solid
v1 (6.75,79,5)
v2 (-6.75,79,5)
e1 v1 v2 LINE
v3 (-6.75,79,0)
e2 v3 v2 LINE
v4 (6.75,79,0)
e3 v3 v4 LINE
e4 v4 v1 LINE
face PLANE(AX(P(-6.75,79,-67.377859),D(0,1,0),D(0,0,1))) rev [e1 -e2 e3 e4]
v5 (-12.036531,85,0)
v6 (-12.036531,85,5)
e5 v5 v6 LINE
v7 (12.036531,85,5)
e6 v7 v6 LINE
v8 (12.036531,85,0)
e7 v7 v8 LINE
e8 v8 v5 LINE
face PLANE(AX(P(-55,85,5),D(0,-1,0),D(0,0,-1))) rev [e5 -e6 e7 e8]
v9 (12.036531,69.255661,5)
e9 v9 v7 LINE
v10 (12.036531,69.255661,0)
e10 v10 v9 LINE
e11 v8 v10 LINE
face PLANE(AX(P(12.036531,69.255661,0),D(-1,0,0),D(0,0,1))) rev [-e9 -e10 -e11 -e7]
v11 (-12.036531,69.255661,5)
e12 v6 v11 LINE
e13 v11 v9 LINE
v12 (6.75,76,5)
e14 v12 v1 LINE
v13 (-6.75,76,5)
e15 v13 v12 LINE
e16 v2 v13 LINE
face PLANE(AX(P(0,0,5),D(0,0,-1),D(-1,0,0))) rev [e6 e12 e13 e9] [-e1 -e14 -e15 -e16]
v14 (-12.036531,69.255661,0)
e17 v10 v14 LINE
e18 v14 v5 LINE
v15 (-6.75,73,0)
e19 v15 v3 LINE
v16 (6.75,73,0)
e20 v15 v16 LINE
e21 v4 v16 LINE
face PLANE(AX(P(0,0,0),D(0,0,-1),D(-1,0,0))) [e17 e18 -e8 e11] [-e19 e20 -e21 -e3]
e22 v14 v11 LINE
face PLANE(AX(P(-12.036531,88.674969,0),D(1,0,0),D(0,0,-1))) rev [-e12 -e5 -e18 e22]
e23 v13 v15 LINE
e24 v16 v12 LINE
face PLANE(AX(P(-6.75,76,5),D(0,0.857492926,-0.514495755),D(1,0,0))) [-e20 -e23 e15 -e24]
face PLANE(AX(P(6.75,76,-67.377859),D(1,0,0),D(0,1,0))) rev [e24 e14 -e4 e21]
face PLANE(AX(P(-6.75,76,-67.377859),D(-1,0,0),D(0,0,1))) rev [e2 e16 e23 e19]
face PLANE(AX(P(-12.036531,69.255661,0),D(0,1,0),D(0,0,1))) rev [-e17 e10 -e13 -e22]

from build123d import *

# Parameters (mm, degrees)
SKIZZE1_W                                 = 110
SKIZZE1_H                                 = 170
AUFSATZ_LINEAR_AUSTRAGEN1_DEPTH           = 5
VERRUNDUNG1_R                             = 5
SCHNITT_LINEAR_AUSTRAGEN1_DEPTH           = 102.365674664
SKIZZE2_R                                 = 27
SCHNITT_LINEAR_AUSTRAGEN2_DEPTH           = 3
FASE1_SIZE                                = 3
SKIZZE4_R                                 = 4
AUFSATZ_LINEAR_AUSTRAGEN2_DEPTH           = 69
FASE2_SIZE                                = 1
LINEARES_MUSTER1_COUNT                    = 2
LINEARES_MUSTER1_PITCH                    = 134
LINEARES_MUSTER1_COUNT_DIR2               = 2
LINEARES_MUSTER1_PITCH_DIR2               = 98
FASE2_OF_LINEARES_MUSTER1_SIZE            = 1
VERRUNDUNG2_R                             = 1
GEWINDE1_PITCH                            = 1
GEWINDE2_PITCH                            = 1
GEWINDE3_PITCH                            = 1
GEWINDE4_PITCH                            = 1
SKIZZE10_W                                = 120
SKIZZE10_H                                = 150
SCHNITT_LINEAR_AUSTRAGEN4_DEPTH           = 2
SKIZZE12_R                                = 2
SCHNITT_LINEAR_AUSTRAGEN5_DEPTH           = 4.5
SKIZZE13_W                                = 11
SKIZZE13_H                                = 3
SKIZZE13_W_2                              = 3
SKIZZE13_H_2                              = 11
SKIZZE13_W_3                              = 13.5
SCHNITT_LINEAR_AUSTRAGEN6_DEPTH           = 125.233650894
SKIZZE14_R                                = 3
AUFSATZ_LINEAR_AUSTRAGEN3_DEPTH           = 4
SKIZZE15_R                                = 0.95
AUFSATZ_LINEAR_AUSTRAGEN4_DEPTH           = 4
AUFSATZ_LINEAR_AUSTRAGEN4_DRAFT           = 2
AUFSATZ_LINEAR_AUSTRAGEN4_PROFILE_2_DEPTH = 4
AUFSATZ_LINEAR_AUSTRAGEN4_PROFILE_2_DRAFT = 2
SKIZZE16_W                                = 123.691442011
SKIZZE16_H                                = 148.84203522
SCHNITT_LINEAR_AUSTRAGEN7_DEPTH           = 125.233650894
SKIZZE17_W                                = 11
SKIZZE17_H                                = 3
SCHNITT_LINEAR_AUSTRAGEN8_DEPTH           = 125.233650894
SCHNITT_LINEAR_AUSTRAGEN9_DEPTH           = 125.233650894
SCHNITT_LINEAR_AUSTRAGEN10_DEPTH          = 92.167499001
SCHNITT_LINEAR_AUSTRAGEN10_DEPTH_BACK     = 92.167499001
FASE3_SIZE2                               = 5
FASE3_SIZE                                = 3


with BuildPart() as part:
    # Skizze1 → Aufsatz-Linear austragen1 (new body)
    with BuildSketch(Plane.XY):
        Rectangle(SKIZZE1_W, SKIZZE1_H)
    extrude(amount=AUFSATZ_LINEAR_AUSTRAGEN1_DEPTH)

    # Verrundung1
    verrundung1_edges = [part.edges().sort_by_distance(p)[0] for p in [
        (55, -85, 2.5),
        (-55, -85, 2.5),
        (-55, 85, 2.5),
        (55, 85, 2.5),
    ]]
    fillet(verrundung1_edges, radius=VERRUNDUNG1_R)

    # Skizze3 → Schnitt-Linear austragen1 (cut, through all)
    with BuildSketch(Plane.XY.offset(5)):
        with BuildLine():
            Line((-35, 35), (-35, 17))
            ThreePointArc((-35, 17), (-27.513632984, 27.513632984), (-17, 35))
            Line((-17, 35), (-35, 35))
        make_face()
        with BuildLine():
            Line((35, 35), (17, 35))
            ThreePointArc((17, 35), (27.513632984, 27.513632984), (35, 17))
            Line((35, 17), (35, 35))
        make_face()
        with BuildLine():
            Line((35, -35), (35, -17))
            ThreePointArc((35, -17), (27.513632984, -27.513632984), (17, -35))
            Line((17, -35), (35, -35))
        make_face()
        with BuildLine():
            Line((-35, -35), (-17, -35))
            ThreePointArc((-17, -35), (-27.513632984, -27.513632984), (-35, -17))
            Line((-35, -17), (-35, -35))
        make_face()
    extrude(amount=-SCHNITT_LINEAR_AUSTRAGEN1_DEPTH, mode=Mode.SUBTRACT)

    # Skizze2 → Schnitt-Linear austragen2 (cut)
    with BuildSketch(Plane.XY.offset(5)):
        Circle(SKIZZE2_R)
    extrude(amount=-SCHNITT_LINEAR_AUSTRAGEN2_DEPTH, mode=Mode.SUBTRACT)

    # Fase1
    fase1_edges = [part.edges().sort_by_distance(p)[0] for p in [
        (-27, 0, 5),
    ]]
    chamfer(fase1_edges, length=FASE1_SIZE - 0.0001)  # a hair under: the kernel refuses the full size

    # Skizze4 → Aufsatz-Linear austragen2 (add)
    with BuildSketch(Plane(origin=(0, 0, 0), x_dir=(-1, 0, 0), z_dir=(0, 0, -1))):
        with Locations((-49, 67)):
            Circle(SKIZZE4_R)
    aufsatz_linear_austragen2 = extrude(amount=AUFSATZ_LINEAR_AUSTRAGEN2_DEPTH)

    # Fase2
    fase2_edges = [part.edges().sort_by_distance(p)[0] for p in [
        (53, 67, 0),
    ]]
    chamfer(fase2_edges, length=FASE2_SIZE)

    # Lineares Muster1: Aufsatz-Linear austragen2 2 × 2
    with Locations(*[(-j * LINEARES_MUSTER1_PITCH_DIR2, -i * LINEARES_MUSTER1_PITCH, 0) for i in range(LINEARES_MUSTER1_COUNT) for j in range(LINEARES_MUSTER1_COUNT_DIR2) if (i, j) != (0, 0)]):
        add(aufsatz_linear_austragen2)

    # Fase2 of Lineares Muster1
    fase2_of_lineares_muster1_edges = [part.edges().sort_by_distance(p)[0] for p in [
        (-45, 67, 0),
        (53, -67, 0),
        (-45, -67, 0),
    ]]
    chamfer(fase2_of_lineares_muster1_edges, length=FASE2_OF_LINEARES_MUSTER1_SIZE)

    # Verrundung2
    verrundung2_edges = [part.edges().sort_by_distance(p)[0] for p in [
        (-35, -35, 2.5),
        (-35, -17, 2.5),
        (-17, -35, 2.5),
        (35, -35, 2.5),
        (17, -35, 2.5),
        (35, -17, 2.5),
        (35, 35, 2.5),
        (35, 17, 2.5),
        (17, 35, 2.5),
        (-35, 35, 2.5),
        (-17, 35, 2.5),
        (-35, 17, 2.5),
    ]]
    fillet(verrundung2_edges, radius=VERRUNDUNG2_R)

    # Gewinde1: the profile of Gewindeprofil1 profile screwed along a right-hand helix of 12 turns, 8 arcs to a turn; built about Z, then put on its axis
    gewinde1_z = Axis((0, 0, 0), (0, 0, 1))
    gewinde1_corners = [(4.0003, 0, -0.000173205), (4.0003, 0, 0.875173202), (3.458734125, 0, 0.562499999), (3.458734125, 0, 0.312499999)]
    with BuildLine(mode=Mode.PRIVATE) as gewinde1_profile:
        Line(gewinde1_corners[0], gewinde1_corners[1])
        Line(gewinde1_corners[1], gewinde1_corners[2])
        Line(gewinde1_corners[2], gewinde1_corners[3])
        Line(gewinde1_corners[3], gewinde1_corners[0])
    gewinde1_cap = Face(gewinde1_profile.wire())
    gewinde1_turn_angles = [0, 22.5, 45, 67.5, 90, 112.5, 135, 157.5, 180, 202.5, 225, 247.5, 270, 292.5, 315, 337.5, 360]
    gewinde1_turn_weights = [1, 0.9238795325112867, 1, 0.9238795325112867, 1, 0.9238795325112867, 1, 0.9238795325112867, 1, 0.9238795325112867, 1, 0.9238795325112867, 1, 0.9238795325112867, 1, 0.9238795325112867, 1]
    gewinde1_turn_rails = [Edge.make_bspline([Vector(p[0], p[1], 0).rotate(gewinde1_z, gewinde1_turn_angles[k]) / gewinde1_turn_weights[k] + Vector(0, 0, p[2] + GEWINDE1_PITCH * gewinde1_turn_angles[k] / 360) for k in range(17)], [0, 0, 0, 1, 1, 2, 2, 3, 3, 4, 4, 5, 5, 6, 6, 7, 7, 8, 8, 8], 2, gewinde1_turn_weights) for p in gewinde1_corners]
    gewinde1_turn_sides = [Face.make_surface_from_curves(gewinde1_turn_rails[p[0]], gewinde1_turn_rails[p[1]]) for p in [(0, 1), (1, 2), (2, 3), (3, 0)]]
    gewinde1 = Plane(origin=(49, 67, -69), x_dir=(1, 0, 0), z_dir=(0, 0, 1)) * Solid(Shell([*[p.moved(Location((0, 0, GEWINDE1_PITCH * i))) for i in range(12) for p in gewinde1_turn_sides], gewinde1_cap, gewinde1_cap.rotate(gewinde1_z, 4320).moved(Location((0, 0, GEWINDE1_PITCH * 4320 / 360)))]))
    add(gewinde1, mode=Mode.SUBTRACT)

    # Gewinde2: the profile of Gewindeprofil2 profile screwed along a right-hand helix of 12 turns, 8 arcs to a turn; built about Z, then put on its axis
    gewinde2_z = Axis((0, 0, 0), (0, 0, 1))
    gewinde2_corners = [(4.0003, 0, -0.000173205), (4.0003, 0, 0.875173202), (3.458734125, 0, 0.562499999), (3.458734125, 0, 0.312499999)]
    with BuildLine(mode=Mode.PRIVATE) as gewinde2_profile:
        Line(gewinde2_corners[0], gewinde2_corners[1])
        Line(gewinde2_corners[1], gewinde2_corners[2])
        Line(gewinde2_corners[2], gewinde2_corners[3])
        Line(gewinde2_corners[3], gewinde2_corners[0])
    gewinde2_cap = Face(gewinde2_profile.wire())
    gewinde2_turn_angles = [0, 22.5, 45, 67.5, 90, 112.5, 135, 157.5, 180, 202.5, 225, 247.5, 270, 292.5, 315, 337.5, 360]
    gewinde2_turn_weights = [1, 0.9238795325112867, 1, 0.9238795325112867, 1, 0.9238795325112867, 1, 0.9238795325112867, 1, 0.9238795325112867, 1, 0.9238795325112867, 1, 0.9238795325112867, 1, 0.9238795325112867, 1]
    gewinde2_turn_rails = [Edge.make_bspline([Vector(p[0], p[1], 0).rotate(gewinde2_z, gewinde2_turn_angles[k]) / gewinde2_turn_weights[k] + Vector(0, 0, p[2] + GEWINDE2_PITCH * gewinde2_turn_angles[k] / 360) for k in range(17)], [0, 0, 0, 1, 1, 2, 2, 3, 3, 4, 4, 5, 5, 6, 6, 7, 7, 8, 8, 8], 2, gewinde2_turn_weights) for p in gewinde2_corners]
    gewinde2_turn_sides = [Face.make_surface_from_curves(gewinde2_turn_rails[p[0]], gewinde2_turn_rails[p[1]]) for p in [(0, 1), (1, 2), (2, 3), (3, 0)]]
    gewinde2 = Plane(origin=(49, -67, -69), x_dir=(1, 0, 0), z_dir=(0, 0, 1)) * Solid(Shell([*[p.moved(Location((0, 0, GEWINDE2_PITCH * i))) for i in range(12) for p in gewinde2_turn_sides], gewinde2_cap, gewinde2_cap.rotate(gewinde2_z, 4320).moved(Location((0, 0, GEWINDE2_PITCH * 4320 / 360)))]))
    add(gewinde2, mode=Mode.SUBTRACT)

    # Gewinde3: the profile of Gewindeprofil3 profile screwed along a right-hand helix of 12 turns, 8 arcs to a turn; built about Z, then put on its axis
    gewinde3_z = Axis((0, 0, 0), (0, 0, 1))
    gewinde3_corners = [(4.0003, 0, -0.000173205), (4.0003, 0, 0.875173202), (3.458734125, 0, 0.562499999), (3.458734125, 0, 0.312499999)]
    with BuildLine(mode=Mode.PRIVATE) as gewinde3_profile:
        Line(gewinde3_corners[0], gewinde3_corners[1])
        Line(gewinde3_corners[1], gewinde3_corners[2])
        Line(gewinde3_corners[2], gewinde3_corners[3])
        Line(gewinde3_corners[3], gewinde3_corners[0])
    gewinde3_cap = Face(gewinde3_profile.wire())
    gewinde3_turn_angles = [0, 22.5, 45, 67.5, 90, 112.5, 135, 157.5, 180, 202.5, 225, 247.5, 270, 292.5, 315, 337.5, 360]
    gewinde3_turn_weights = [1, 0.9238795325112867, 1, 0.9238795325112867, 1, 0.9238795325112867, 1, 0.9238795325112867, 1, 0.9238795325112867, 1, 0.9238795325112867, 1, 0.9238795325112867, 1, 0.9238795325112867, 1]
    gewinde3_turn_rails = [Edge.make_bspline([Vector(p[0], p[1], 0).rotate(gewinde3_z, gewinde3_turn_angles[k]) / gewinde3_turn_weights[k] + Vector(0, 0, p[2] + GEWINDE3_PITCH * gewinde3_turn_angles[k] / 360) for k in range(17)], [0, 0, 0, 1, 1, 2, 2, 3, 3, 4, 4, 5, 5, 6, 6, 7, 7, 8, 8, 8], 2, gewinde3_turn_weights) for p in gewinde3_corners]
    gewinde3_turn_sides = [Face.make_surface_from_curves(gewinde3_turn_rails[p[0]], gewinde3_turn_rails[p[1]]) for p in [(0, 1), (1, 2), (2, 3), (3, 0)]]
    gewinde3 = Plane(origin=(-49, -67, -69), x_dir=(1, 0, 0), z_dir=(0, 0, 1)) * Solid(Shell([*[p.moved(Location((0, 0, GEWINDE3_PITCH * i))) for i in range(12) for p in gewinde3_turn_sides], gewinde3_cap, gewinde3_cap.rotate(gewinde3_z, 4320).moved(Location((0, 0, GEWINDE3_PITCH * 4320 / 360)))]))
    add(gewinde3, mode=Mode.SUBTRACT)

    # Gewinde4: the profile of Gewindeprofil4 profile screwed along a right-hand helix of 12 turns, 8 arcs to a turn; built about Z, then put on its axis
    gewinde4_z = Axis((0, 0, 0), (0, 0, 1))
    gewinde4_corners = [(4.0003, 0, -0.000173205), (4.0003, 0, 0.875173202), (3.458734125, 0, 0.562499999), (3.458734125, 0, 0.312499999)]
    with BuildLine(mode=Mode.PRIVATE) as gewinde4_profile:
        Line(gewinde4_corners[0], gewinde4_corners[1])
        Line(gewinde4_corners[1], gewinde4_corners[2])
        Line(gewinde4_corners[2], gewinde4_corners[3])
        Line(gewinde4_corners[3], gewinde4_corners[0])
    gewinde4_cap = Face(gewinde4_profile.wire())
    gewinde4_turn_angles = [0, 22.5, 45, 67.5, 90, 112.5, 135, 157.5, 180, 202.5, 225, 247.5, 270, 292.5, 315, 337.5, 360]
    gewinde4_turn_weights = [1, 0.9238795325112867, 1, 0.9238795325112867, 1, 0.9238795325112867, 1, 0.9238795325112867, 1, 0.9238795325112867, 1, 0.9238795325112867, 1, 0.9238795325112867, 1, 0.9238795325112867, 1]
    gewinde4_turn_rails = [Edge.make_bspline([Vector(p[0], p[1], 0).rotate(gewinde4_z, gewinde4_turn_angles[k]) / gewinde4_turn_weights[k] + Vector(0, 0, p[2] + GEWINDE4_PITCH * gewinde4_turn_angles[k] / 360) for k in range(17)], [0, 0, 0, 1, 1, 2, 2, 3, 3, 4, 4, 5, 5, 6, 6, 7, 7, 8, 8, 8], 2, gewinde4_turn_weights) for p in gewinde4_corners]
    gewinde4_turn_sides = [Face.make_surface_from_curves(gewinde4_turn_rails[p[0]], gewinde4_turn_rails[p[1]]) for p in [(0, 1), (1, 2), (2, 3), (3, 0)]]
    gewinde4 = Plane(origin=(-49, 67, -69), x_dir=(1, 0, 0), z_dir=(0, 0, 1)) * Solid(Shell([*[p.moved(Location((0, 0, GEWINDE4_PITCH * i))) for i in range(12) for p in gewinde4_turn_sides], gewinde4_cap, gewinde4_cap.rotate(gewinde4_z, 4320).moved(Location((0, 0, GEWINDE4_PITCH * 4320 / 360)))]))
    add(gewinde4, mode=Mode.SUBTRACT)

    # Skizze10 → Schnitt-Linear austragen4 (cut)
    with BuildSketch(Plane(origin=(0, 0, -69), x_dir=(-1, 0, 0), z_dir=(0, 0, -1))):
        Rectangle(SKIZZE10_W, SKIZZE10_H)
    extrude(amount=-SCHNITT_LINEAR_AUSTRAGEN4_DEPTH, mode=Mode.SUBTRACT)

    # Skizze12 → Schnitt-Linear austragen5 (cut)
    with BuildSketch(Plane(origin=(0, 0, 0), x_dir=(-1, 0, 0), z_dir=(0, 0, -1))):
        with Locations((49, 59.5)):
            Circle(SKIZZE12_R)
        with Locations(Location((-49, 59.5, 0), (0, 0, 180))):
            Circle(SKIZZE12_R)
        with Locations((-49, -59.5)):
            Circle(SKIZZE12_R)
        with Locations(Location((49, -59.5, 0), (0, 0, 180))):
            Circle(SKIZZE12_R)
    extrude(amount=-SCHNITT_LINEAR_AUSTRAGEN5_DEPTH, mode=Mode.SUBTRACT)

    # Skizze13 → Schnitt-Linear austragen6 (cut, through all)
    with BuildSketch(Plane.XY.offset(5)):
        with Locations((0, -75.5)):
            Rectangle(SKIZZE13_W, SKIZZE13_H)
        with Locations((45.5, 0)):
            Rectangle(SKIZZE13_W_2, SKIZZE13_H_2)
        with Locations((-45.5, 0)):
            Rectangle(SKIZZE13_W_2, SKIZZE13_H_2)
        with Locations((0, 77.5)):
            Rectangle(SKIZZE13_W_3, SKIZZE13_H)
    extrude(amount=-SCHNITT_LINEAR_AUSTRAGEN6_DEPTH, mode=Mode.SUBTRACT)

    # Skizze14 → Aufsatz-Linear austragen3 (add)
    with BuildSketch(Plane.XY.offset(5)):
        with Locations(Location((6, 65, 0), (0, 0, 180))):
            Circle(SKIZZE14_R)
        with Locations(Location((-6, 65, 0), (0, 0, 180))):
            Circle(SKIZZE14_R)
    extrude(amount=AUFSATZ_LINEAR_AUSTRAGEN3_DEPTH)


with BuildPart() as aufsatz_linear_austragen4_tool:
    # Skizze15 → Aufsatz-Linear austragen4 (with draft: the straight prism first)
    with BuildSketch(Plane.XY.offset(9)):
        with Locations((-6, 65)):
            Circle(SKIZZE15_R)
    extrude(amount=AUFSATZ_LINEAR_AUSTRAGEN4_DEPTH)
    # Aufsatz-Linear austragen4: the draft: its side faces are tilted about the plane it starts from
    aufsatz_linear_austragen4_sides = [aufsatz_linear_austragen4_tool.faces().sort_by_distance(p)[0] for p in [
        (-6.95, 65, 11),
    ]]
    draft(aufsatz_linear_austragen4_sides, Plane.XY.offset(9), AUFSATZ_LINEAR_AUSTRAGEN4_DRAFT)


with BuildPart() as part_1:
    add(part.part)

    # Aufsatz-Linear austragen4: add aufsatz_linear_austragen4_tool
    add(aufsatz_linear_austragen4_tool.part)


with BuildPart() as aufsatz_linear_austragen4_profile_2_tool:
    # Skizze15 → Aufsatz-Linear austragen4 profile 2 (with draft: the straight prism first)
    with BuildSketch(Plane.XY.offset(9)):
        with Locations((6, 65)):
            Circle(SKIZZE15_R)
    extrude(amount=AUFSATZ_LINEAR_AUSTRAGEN4_PROFILE_2_DEPTH)
    # Aufsatz-Linear austragen4 profile 2: the draft: its side faces are tilted about the plane it starts from
    aufsatz_linear_austragen4_profile_2_sides = [aufsatz_linear_austragen4_profile_2_tool.faces().sort_by_distance(p)[0] for p in [
        (5.05, 65, 11),
    ]]
    draft(aufsatz_linear_austragen4_profile_2_sides, Plane.XY.offset(9), AUFSATZ_LINEAR_AUSTRAGEN4_PROFILE_2_DRAFT)


with BuildPart() as part_2:
    add(part_1.part)

    # Aufsatz-Linear austragen4 profile 2: add aufsatz_linear_austragen4_profile_2_tool
    add(aufsatz_linear_austragen4_profile_2_tool.part)

    # Skizze16 → Schnitt-Linear austragen7 (cut, through all)
    with BuildSketch(Plane.XY.offset(5)):
        with Locations((1.053547931, -15.254497888)):
            Rectangle(SKIZZE16_W, SKIZZE16_H)
    extrude(amount=-SCHNITT_LINEAR_AUSTRAGEN7_DEPTH, mode=Mode.SUBTRACT)

    # Skizze17 → Schnitt-Linear austragen8 (cut, through all)
    with BuildSketch(Plane.XY.offset(5)):
        with Locations((-25, 77.5)):
            Rectangle(SKIZZE17_W, SKIZZE17_H)
        with Locations((25, 77.5)):
            Rectangle(SKIZZE17_W, SKIZZE17_H)
    extrude(amount=-SCHNITT_LINEAR_AUSTRAGEN8_DEPTH, mode=Mode.SUBTRACT)

    # Skizze18 → Schnitt-Linear austragen9 (cut, through all)
    with BuildSketch(Plane.XY.offset(5)):
        Polygon((-56.129703441, 86.036343512), (-31.976755215, 86.036343512), (-31.976755215, 69.255661459), (-12.036530516, 69.255661459), (-12.036530516, 52.474979407), (-31.976755215, 52.474979407), (-56.129703441, 52.474979407), align=None)
        Polygon((56.129703441, 86.036343512), (56.129703441, 52.474979407), (31.976755215, 52.474979407), (12.036530516, 52.474979407), (12.036530516, 69.255661459), (31.976755215, 69.255661459), (31.976755215, 86.036343512), align=None)
    extrude(amount=-SCHNITT_LINEAR_AUSTRAGEN9_DEPTH, mode=Mode.SUBTRACT)

    # Skizze19 → Schnitt-Linear austragen10 (cut, two sides: drawn at the far end of the back side and taken through both)
    with BuildSketch(Plane.XY.offset(5).offset(-SCHNITT_LINEAR_AUSTRAGEN10_DEPTH_BACK)):
        Polygon((-36.863489822, 88.674968535), (-12.036530516, 88.674968535), (-12.036530516, 69.255661459), (12.036530516, 69.255661459), (12.036530516, 91.604966771), (35.434216654, 91.604966771), (35.434216654, 59.166519722), (12.036530516, 59.166519722), (-12.036530516, 59.166519722), (-36.863489822, 59.166519722), align=None)
    extrude(amount=SCHNITT_LINEAR_AUSTRAGEN10_DEPTH + SCHNITT_LINEAR_AUSTRAGEN10_DEPTH_BACK, mode=Mode.SUBTRACT)

    # Fase3
    fase3_edges = [part_2.edges().sort_by_distance(p)[0] for p in [
        (0, 76, 0),
    ]]
    fase3_side = [part_2.faces().sort_by_distance(p)[0] for p in [
        (0, 75.94, 0),
    ]]
    chamfer(fase3_edges, length=FASE3_SIZE - 0.0001, length2=FASE3_SIZE2 - 0.0001, reference=fase3_side[0])  # a hair under: the kernel refuses the full size


solid = part_2.part
